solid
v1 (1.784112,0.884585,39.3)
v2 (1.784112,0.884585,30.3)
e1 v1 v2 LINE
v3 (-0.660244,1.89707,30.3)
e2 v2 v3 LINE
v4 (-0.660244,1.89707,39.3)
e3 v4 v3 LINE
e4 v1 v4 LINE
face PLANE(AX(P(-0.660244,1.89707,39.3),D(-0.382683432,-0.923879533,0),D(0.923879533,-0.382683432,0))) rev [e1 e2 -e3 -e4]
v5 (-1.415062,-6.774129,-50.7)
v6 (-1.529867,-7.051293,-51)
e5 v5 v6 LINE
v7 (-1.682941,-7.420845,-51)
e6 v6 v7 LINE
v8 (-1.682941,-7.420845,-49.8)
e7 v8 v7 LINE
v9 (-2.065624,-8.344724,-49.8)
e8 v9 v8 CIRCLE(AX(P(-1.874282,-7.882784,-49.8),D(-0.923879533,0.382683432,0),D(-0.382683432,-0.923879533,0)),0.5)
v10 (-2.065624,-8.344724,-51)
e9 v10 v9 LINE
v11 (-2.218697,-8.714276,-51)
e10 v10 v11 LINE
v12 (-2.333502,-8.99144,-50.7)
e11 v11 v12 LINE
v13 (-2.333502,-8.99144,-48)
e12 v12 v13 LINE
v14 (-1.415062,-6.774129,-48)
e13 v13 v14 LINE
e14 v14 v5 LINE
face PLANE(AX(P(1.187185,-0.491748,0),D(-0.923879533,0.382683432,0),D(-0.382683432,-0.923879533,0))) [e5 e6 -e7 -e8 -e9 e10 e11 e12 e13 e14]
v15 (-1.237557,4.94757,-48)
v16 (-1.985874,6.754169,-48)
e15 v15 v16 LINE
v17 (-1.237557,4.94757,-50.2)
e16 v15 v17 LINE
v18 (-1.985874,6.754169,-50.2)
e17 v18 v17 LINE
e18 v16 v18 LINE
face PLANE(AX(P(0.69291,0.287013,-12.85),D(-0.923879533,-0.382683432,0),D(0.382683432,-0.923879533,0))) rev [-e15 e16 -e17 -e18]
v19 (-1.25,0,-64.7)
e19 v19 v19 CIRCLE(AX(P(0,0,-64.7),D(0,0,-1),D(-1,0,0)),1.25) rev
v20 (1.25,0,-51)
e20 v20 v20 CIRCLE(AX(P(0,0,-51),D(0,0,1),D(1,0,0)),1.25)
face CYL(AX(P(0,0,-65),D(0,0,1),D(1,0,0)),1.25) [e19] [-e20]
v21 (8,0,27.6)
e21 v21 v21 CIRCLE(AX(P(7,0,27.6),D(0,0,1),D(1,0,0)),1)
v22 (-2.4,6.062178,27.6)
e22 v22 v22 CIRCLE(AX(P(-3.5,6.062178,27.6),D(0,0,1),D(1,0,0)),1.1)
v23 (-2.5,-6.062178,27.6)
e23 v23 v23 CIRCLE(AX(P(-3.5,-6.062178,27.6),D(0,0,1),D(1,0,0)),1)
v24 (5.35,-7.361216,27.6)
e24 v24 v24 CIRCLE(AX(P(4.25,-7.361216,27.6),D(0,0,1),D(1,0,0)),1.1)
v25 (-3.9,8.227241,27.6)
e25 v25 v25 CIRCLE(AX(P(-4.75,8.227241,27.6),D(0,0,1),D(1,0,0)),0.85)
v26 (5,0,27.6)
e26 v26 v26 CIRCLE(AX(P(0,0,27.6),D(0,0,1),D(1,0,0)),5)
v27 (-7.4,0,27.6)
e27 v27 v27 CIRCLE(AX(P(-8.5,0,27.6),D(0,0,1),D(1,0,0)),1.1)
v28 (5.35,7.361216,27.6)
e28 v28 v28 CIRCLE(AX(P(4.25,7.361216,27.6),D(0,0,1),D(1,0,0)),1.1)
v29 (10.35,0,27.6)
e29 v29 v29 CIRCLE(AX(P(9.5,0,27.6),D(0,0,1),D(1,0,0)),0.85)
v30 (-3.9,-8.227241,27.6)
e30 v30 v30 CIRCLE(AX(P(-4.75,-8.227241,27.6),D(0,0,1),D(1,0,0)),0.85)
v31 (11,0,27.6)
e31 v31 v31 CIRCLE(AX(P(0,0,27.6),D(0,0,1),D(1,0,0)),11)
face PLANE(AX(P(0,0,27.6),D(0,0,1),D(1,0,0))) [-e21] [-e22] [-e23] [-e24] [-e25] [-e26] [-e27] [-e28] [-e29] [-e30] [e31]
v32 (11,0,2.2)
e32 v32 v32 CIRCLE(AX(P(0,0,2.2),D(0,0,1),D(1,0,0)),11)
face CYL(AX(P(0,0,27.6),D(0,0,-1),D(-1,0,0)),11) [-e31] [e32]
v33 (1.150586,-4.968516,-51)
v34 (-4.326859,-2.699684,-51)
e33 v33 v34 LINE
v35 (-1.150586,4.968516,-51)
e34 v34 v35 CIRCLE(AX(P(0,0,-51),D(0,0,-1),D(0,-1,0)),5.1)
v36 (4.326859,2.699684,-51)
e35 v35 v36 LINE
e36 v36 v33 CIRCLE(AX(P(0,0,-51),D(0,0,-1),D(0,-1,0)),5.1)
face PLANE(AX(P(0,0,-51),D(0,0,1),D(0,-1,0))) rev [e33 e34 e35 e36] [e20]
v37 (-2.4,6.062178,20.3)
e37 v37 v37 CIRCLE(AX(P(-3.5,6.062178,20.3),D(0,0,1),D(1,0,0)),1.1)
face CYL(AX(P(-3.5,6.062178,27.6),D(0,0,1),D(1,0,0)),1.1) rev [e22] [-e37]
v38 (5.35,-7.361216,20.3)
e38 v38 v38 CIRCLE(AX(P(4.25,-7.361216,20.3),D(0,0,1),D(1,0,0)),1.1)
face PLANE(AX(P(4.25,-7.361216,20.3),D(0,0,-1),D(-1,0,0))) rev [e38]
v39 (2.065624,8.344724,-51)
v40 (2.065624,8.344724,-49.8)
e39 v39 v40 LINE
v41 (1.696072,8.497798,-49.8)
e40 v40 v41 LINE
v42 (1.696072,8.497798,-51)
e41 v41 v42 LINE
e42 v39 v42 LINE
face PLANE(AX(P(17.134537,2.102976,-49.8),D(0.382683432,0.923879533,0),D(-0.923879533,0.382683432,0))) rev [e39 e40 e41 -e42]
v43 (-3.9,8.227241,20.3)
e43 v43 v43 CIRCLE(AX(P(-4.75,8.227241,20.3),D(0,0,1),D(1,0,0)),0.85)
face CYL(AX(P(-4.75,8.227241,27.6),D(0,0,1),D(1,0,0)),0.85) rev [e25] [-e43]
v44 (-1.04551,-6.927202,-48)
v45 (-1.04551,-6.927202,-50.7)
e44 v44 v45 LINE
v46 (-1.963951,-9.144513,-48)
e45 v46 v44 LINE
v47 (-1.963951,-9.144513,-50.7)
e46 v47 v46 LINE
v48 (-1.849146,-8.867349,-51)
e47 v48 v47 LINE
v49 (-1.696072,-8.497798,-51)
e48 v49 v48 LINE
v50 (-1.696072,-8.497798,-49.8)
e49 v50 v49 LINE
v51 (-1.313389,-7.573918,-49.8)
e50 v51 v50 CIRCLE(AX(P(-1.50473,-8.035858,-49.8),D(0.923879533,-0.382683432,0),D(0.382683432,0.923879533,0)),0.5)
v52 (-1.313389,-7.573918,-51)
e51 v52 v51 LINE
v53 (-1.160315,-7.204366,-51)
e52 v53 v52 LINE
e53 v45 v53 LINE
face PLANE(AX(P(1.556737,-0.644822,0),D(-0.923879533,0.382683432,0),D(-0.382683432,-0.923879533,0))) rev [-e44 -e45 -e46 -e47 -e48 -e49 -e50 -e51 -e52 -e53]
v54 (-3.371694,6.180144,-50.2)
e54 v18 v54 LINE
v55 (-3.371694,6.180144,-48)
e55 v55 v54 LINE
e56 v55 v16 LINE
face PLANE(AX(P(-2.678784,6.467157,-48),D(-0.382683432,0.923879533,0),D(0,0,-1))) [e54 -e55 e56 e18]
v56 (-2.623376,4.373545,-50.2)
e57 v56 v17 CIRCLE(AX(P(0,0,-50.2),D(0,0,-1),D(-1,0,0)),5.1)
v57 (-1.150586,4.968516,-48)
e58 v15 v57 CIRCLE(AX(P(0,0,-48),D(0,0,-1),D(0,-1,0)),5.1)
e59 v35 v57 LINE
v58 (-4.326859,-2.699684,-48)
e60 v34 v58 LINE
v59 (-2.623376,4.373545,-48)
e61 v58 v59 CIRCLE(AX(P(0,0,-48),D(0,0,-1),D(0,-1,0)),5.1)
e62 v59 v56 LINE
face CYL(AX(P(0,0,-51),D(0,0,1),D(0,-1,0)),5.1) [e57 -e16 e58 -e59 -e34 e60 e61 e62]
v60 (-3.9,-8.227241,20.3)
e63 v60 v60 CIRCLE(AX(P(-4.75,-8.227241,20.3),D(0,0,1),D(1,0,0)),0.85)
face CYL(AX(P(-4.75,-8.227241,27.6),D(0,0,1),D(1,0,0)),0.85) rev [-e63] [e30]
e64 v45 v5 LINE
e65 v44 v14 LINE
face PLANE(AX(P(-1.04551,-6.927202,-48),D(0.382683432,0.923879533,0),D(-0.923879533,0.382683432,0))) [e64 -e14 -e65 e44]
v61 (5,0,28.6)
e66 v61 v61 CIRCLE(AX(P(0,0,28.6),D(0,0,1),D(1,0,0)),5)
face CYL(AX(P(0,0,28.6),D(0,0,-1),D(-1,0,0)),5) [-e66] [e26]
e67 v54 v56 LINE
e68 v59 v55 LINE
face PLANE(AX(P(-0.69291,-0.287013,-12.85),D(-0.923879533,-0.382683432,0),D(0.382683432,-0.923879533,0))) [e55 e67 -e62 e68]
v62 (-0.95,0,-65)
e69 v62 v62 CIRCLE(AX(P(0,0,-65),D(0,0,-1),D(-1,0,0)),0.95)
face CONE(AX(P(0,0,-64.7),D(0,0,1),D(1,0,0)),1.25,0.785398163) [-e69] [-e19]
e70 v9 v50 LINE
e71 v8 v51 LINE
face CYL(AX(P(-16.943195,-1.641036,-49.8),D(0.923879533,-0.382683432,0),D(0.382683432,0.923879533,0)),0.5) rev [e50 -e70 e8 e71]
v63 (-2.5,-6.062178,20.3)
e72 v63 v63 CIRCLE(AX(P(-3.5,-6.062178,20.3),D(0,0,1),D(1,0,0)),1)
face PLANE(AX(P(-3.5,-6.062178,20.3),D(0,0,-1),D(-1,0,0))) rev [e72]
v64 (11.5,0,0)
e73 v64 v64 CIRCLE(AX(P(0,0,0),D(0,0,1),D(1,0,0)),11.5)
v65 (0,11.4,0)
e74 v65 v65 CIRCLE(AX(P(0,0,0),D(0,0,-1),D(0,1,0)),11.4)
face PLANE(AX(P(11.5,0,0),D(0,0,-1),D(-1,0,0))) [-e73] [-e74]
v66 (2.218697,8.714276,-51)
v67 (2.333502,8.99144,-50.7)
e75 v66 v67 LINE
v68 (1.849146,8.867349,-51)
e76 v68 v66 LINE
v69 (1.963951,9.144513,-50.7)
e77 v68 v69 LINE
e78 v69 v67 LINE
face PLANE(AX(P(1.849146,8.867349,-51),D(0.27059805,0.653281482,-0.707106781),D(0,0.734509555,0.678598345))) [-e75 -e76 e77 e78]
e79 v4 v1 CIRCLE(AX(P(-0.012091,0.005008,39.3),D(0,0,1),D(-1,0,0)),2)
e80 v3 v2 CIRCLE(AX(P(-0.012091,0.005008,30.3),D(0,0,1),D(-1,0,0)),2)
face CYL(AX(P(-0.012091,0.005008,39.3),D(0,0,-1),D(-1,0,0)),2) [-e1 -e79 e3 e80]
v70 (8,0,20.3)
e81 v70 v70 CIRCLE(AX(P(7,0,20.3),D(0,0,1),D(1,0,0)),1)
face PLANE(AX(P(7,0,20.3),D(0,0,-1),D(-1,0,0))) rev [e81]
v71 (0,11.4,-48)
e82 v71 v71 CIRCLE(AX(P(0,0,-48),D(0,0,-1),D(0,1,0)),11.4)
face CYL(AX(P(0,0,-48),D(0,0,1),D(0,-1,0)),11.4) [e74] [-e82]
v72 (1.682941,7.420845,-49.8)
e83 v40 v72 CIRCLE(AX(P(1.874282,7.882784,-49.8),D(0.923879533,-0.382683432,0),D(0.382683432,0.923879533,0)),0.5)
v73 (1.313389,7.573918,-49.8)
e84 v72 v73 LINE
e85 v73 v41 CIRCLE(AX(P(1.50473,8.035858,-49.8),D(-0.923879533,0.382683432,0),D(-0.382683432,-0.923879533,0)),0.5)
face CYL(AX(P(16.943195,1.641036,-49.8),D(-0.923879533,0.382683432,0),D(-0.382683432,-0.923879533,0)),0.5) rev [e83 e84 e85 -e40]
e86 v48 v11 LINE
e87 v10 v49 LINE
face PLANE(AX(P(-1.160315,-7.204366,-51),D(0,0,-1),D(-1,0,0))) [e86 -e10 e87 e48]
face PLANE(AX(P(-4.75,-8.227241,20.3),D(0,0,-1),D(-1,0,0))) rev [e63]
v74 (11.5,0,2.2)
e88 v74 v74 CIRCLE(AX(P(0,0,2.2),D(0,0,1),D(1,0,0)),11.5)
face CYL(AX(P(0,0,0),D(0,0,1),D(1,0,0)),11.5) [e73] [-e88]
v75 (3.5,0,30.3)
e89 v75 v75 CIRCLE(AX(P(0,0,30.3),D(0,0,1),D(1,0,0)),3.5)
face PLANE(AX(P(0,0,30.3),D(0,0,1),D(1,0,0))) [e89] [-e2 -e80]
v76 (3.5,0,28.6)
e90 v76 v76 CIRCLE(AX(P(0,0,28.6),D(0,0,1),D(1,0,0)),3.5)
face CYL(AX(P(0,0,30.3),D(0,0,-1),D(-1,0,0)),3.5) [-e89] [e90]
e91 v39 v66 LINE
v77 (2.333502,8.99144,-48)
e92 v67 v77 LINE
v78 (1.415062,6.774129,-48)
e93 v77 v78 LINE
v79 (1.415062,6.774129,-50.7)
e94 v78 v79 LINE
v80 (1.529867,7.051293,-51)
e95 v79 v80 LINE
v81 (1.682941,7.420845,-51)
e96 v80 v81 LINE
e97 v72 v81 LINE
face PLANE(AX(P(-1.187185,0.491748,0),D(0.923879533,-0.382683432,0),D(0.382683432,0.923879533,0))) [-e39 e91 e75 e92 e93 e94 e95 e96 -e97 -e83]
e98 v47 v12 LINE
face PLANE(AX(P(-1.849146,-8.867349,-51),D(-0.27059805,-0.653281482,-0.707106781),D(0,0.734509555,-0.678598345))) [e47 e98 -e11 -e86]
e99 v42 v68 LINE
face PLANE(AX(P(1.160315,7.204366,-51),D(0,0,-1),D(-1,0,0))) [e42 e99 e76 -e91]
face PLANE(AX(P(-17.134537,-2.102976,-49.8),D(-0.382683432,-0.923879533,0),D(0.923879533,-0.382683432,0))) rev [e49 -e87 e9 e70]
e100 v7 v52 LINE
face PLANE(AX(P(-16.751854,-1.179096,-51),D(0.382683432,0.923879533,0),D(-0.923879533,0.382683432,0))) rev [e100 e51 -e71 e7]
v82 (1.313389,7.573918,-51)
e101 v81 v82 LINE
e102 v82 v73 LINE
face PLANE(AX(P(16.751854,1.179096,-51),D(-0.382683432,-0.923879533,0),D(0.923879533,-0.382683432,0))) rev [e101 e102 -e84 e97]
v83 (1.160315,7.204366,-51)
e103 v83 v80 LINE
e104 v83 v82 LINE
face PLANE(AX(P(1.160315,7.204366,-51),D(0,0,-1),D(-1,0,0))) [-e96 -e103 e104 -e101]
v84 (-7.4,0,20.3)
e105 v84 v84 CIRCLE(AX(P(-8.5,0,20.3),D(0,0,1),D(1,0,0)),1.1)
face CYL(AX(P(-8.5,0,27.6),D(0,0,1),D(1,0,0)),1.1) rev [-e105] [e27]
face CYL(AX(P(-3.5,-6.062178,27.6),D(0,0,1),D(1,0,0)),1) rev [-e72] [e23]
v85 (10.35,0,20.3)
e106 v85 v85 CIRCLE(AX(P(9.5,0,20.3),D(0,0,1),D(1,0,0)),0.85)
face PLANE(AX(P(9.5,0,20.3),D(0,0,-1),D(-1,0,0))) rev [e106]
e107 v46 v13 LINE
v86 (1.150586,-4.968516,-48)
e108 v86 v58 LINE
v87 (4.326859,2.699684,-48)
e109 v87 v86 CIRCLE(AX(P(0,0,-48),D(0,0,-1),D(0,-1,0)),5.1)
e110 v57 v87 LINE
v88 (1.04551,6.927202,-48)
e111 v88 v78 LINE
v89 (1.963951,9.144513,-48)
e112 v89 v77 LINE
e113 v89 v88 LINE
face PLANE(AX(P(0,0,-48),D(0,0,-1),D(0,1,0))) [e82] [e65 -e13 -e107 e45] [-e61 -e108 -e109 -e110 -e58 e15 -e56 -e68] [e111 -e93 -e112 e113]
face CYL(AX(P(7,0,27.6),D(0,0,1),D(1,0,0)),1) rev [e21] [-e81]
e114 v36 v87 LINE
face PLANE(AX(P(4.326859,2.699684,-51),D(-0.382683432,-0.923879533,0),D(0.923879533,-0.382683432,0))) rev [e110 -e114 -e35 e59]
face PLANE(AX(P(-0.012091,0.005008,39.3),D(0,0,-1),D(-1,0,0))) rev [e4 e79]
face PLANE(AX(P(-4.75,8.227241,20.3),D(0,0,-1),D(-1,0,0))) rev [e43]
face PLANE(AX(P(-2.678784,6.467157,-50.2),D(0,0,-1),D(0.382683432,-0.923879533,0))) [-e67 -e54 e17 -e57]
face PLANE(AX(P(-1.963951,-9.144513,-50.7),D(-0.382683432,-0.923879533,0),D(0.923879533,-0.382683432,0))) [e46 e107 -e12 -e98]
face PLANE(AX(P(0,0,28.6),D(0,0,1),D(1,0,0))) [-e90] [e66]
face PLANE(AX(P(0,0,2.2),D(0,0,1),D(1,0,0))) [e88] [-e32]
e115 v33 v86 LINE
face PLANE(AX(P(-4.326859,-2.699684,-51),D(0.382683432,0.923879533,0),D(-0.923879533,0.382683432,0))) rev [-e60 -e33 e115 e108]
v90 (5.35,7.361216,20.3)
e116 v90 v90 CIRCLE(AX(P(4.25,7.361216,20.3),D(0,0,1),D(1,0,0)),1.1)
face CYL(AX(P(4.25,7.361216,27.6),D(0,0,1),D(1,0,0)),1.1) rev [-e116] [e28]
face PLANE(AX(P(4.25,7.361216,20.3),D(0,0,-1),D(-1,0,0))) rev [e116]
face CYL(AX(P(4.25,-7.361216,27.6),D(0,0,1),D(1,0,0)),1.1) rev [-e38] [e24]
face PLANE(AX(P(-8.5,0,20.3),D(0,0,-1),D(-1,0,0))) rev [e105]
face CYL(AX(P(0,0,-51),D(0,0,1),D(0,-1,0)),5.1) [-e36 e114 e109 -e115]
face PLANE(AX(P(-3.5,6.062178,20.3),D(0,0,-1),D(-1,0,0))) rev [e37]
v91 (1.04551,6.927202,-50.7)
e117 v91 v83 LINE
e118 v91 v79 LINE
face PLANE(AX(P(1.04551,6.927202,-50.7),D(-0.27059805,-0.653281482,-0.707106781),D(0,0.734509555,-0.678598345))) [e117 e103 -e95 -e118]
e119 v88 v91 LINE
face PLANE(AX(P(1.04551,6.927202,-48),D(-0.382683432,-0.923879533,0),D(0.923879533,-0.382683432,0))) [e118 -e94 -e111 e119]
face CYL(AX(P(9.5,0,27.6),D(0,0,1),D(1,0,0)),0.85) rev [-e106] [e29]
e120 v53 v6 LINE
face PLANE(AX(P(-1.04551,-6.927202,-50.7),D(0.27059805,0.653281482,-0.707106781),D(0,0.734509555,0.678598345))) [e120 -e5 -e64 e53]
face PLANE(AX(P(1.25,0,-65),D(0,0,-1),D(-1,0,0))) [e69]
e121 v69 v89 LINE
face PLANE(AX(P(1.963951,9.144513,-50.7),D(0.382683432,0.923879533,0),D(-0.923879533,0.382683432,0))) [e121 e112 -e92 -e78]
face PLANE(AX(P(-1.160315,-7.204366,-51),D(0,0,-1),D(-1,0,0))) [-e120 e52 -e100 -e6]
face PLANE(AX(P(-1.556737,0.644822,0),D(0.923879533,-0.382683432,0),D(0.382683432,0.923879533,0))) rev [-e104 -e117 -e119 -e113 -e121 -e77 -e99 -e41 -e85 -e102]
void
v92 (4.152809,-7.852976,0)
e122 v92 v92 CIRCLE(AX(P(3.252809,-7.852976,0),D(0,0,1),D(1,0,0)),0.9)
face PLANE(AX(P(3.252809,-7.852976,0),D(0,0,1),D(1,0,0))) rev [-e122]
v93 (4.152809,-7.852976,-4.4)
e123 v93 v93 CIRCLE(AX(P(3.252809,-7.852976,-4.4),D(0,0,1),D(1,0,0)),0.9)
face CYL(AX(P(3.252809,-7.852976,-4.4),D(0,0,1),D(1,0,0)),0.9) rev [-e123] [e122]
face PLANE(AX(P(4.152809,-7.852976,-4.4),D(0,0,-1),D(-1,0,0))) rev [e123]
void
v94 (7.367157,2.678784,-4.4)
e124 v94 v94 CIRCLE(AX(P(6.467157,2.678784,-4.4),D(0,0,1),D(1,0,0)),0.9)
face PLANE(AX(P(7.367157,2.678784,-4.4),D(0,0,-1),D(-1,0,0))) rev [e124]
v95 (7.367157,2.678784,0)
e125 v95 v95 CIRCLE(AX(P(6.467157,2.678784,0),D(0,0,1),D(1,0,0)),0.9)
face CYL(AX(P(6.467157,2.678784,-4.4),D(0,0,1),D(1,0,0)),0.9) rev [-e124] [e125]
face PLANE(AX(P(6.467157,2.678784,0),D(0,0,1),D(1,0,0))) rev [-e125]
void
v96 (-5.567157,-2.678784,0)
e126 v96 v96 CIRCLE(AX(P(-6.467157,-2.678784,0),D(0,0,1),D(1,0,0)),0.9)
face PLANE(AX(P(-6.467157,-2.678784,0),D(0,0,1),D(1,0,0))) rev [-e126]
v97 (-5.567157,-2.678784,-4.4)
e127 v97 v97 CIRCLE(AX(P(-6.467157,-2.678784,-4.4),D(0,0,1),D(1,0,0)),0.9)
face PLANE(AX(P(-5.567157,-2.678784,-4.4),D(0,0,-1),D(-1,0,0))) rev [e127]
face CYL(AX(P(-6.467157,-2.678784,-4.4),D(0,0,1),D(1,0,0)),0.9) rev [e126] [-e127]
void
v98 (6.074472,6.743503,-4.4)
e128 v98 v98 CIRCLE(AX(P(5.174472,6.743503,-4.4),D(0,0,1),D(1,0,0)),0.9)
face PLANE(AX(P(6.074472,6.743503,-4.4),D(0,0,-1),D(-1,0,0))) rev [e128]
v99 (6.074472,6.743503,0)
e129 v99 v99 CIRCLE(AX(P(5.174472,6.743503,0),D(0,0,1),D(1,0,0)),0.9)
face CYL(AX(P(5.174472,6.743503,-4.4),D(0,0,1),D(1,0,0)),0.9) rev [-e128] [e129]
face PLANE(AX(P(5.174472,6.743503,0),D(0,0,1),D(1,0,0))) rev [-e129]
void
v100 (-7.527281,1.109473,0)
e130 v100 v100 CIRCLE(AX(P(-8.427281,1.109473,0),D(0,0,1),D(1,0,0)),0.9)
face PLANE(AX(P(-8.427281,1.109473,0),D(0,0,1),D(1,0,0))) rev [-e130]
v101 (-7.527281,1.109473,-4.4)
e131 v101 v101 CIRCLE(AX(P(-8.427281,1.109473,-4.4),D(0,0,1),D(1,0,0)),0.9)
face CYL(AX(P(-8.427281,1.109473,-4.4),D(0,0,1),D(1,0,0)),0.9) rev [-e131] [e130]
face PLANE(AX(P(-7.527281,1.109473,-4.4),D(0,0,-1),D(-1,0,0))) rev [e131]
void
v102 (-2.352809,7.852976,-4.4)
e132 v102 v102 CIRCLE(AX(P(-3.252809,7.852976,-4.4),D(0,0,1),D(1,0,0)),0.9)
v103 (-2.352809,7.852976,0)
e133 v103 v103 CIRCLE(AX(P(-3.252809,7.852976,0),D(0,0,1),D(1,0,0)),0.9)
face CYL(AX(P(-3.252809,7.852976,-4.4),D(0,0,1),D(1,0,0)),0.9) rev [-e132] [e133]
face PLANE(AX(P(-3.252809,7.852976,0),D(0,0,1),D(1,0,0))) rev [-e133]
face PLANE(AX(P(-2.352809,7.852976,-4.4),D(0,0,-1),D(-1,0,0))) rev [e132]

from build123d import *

# Parameters (mm, degrees)
CROQUIS1_W                          = 11.5
CROQUIS1_H                          = 2.2
CROQUIS2_R                          = 11.4
SALIENTE_EXTRUIR1_DEPTH             = 48
SALIENTE_EXTRUIR2_DEPTH             = 0.4
CORTAR_EXTRUIR1_DEPTH               = 55.027539947
SALIENTE_EXTRUIR3_DEPTH             = 0.4
CORTAR_EXTRUIR2_DEPTH               = 55.027539947
SALIENTE_EXTRUIR4_DEPTH             = 3
CROQUIS8_R                          = 11
SALIENTE_EXTRUIR5_DEPTH             = 25.4
CROQUIS9_R                          = 5
SALIENTE_EXTRUIR6_DEPTH             = 1
CROQUIS10_R                         = 3.5
SALIENTE_EXTRUIR7_DEPTH             = 1.7
SALIENTE_EXTRUIR8_DEPTH             = 9
CROQUIS12_W                         = 1.25
CROQUIS12_H                         = 14
CROQUIS13_W                         = 0.9
CROQUIS13_H                         = 4.4
CROQUIS14_W                         = 0.9
CROQUIS14_H                         = 4.4
CROQUIS15_W                         = 0.9
CROQUIS15_H                         = 4.4
CROQUIS16_W                         = 0.9
CROQUIS16_H                         = 4.4
CROQUIS17_W                         = 0.9
CROQUIS17_H                         = 4.4
CROQUIS18_W                         = 0.9
CROQUIS18_H                         = 4.4
DI_METRO_DE_TALADRO_2_0_2_1_D       = 2
DI_METRO_DE_TALADRO_2_0_2_1_DEPTH   = 7.3
DI_METRO_DE_TALADRO_1_7_1_7_1_D     = 1.7
DI_METRO_DE_TALADRO_1_7_1_7_1_DEPTH = 7.3
DI_METRO_DE_TALADRO_2_2_2_2_1_D     = 2.2
DI_METRO_DE_TALADRO_2_2_2_2_1_DEPTH = 7.3
NERVIO1_START                       = -0.75
NERVIO1_OUTLINE_W                   = 3
NERVIO1_OUTLINE_H                   = 3.2
NERVIO1_DEPTH                       = 1.5
CHAFL_N1_SIZE                       = 0.3


# Read off the part's stored shape, not the designer's step: Nervio1
with BuildPart() as part:
    # Croquis1 → Revolución1 (revolve)
    with BuildSketch(Plane(origin=(0, 0, 0), x_dir=(1, 0, 0), z_dir=(0, 1, 0))):
        with Locations((5.75, -1.1)):
            Rectangle(CROQUIS1_W, CROQUIS1_H)
    revolve(axis=Axis((0, 0, 0), (0, 0, 1)))

    # Croquis2 → Saliente-Extruir1 (add)
    with BuildSketch(Plane(origin=(0, 0, 0), x_dir=(-1, 0, 0), z_dir=(0, 0, -1))):
        with Locations(Location((0, 0, 0), (0, 0, 90))):
            Circle(CROQUIS2_R)
    extrude(amount=SALIENTE_EXTRUIR1_DEPTH)

    # Croquis3 → Saliente-Extruir2 (add)
    with BuildSketch(Plane(origin=(-1.187185199, 0.491748211, 0), x_dir=(0.38268343236508984, 0.9238795325112867, 0), z_dir=(0.9238795325112867, -0.38268343236508984, 0))):
        Polygon((7.1, -51), (8.9, -51), (9.2, -50.7), (9.2, -48), (6.8, -48), (6.8, -50.7), align=None)
    extrude(amount=-SALIENTE_EXTRUIR2_DEPTH)

    # Croquis4 → Cortar-Extruir1 (cut, through all)
    with BuildSketch(Plane(origin=(-1.556737012, 0.644821584, 0), x_dir=(0, 0, 1), z_dir=(-0.9238795325112865, 0.3826834323650905, 0))):
        with BuildLine():
            Line((-51, 8.5), (-51, 7.5))
            Line((-51, 7.5), (-49.8, 7.5))
            ThreePointArc((-49.8, 7.5), (-49.3, 8), (-49.8, 8.5))
            Line((-49.8, 8.5), (-51, 8.5))
        make_face()
    extrude(amount=-CORTAR_EXTRUIR1_DEPTH, mode=Mode.SUBTRACT)

    # Croquis5 → Saliente-Extruir3 (add)
    with BuildSketch(Plane(origin=(1.187185199, -0.491748211, 0), x_dir=(-0.3826834323650898, -0.9238795325112867, 0), z_dir=(-0.9238795325112867, 0.3826834323650898, 0))):
        Polygon((7.1, -51), (8.9, -51), (9.2, -50.7), (9.2, -48), (6.8, -48), (6.8, -50.7), align=None)
    extrude(amount=-SALIENTE_EXTRUIR3_DEPTH)

    # Croquis6 → Cortar-Extruir2 (cut, through all)
    with BuildSketch(Plane(origin=(1.556737012, -0.644821584, 0), x_dir=(0, 0, -1), z_dir=(0.9238795325112837, -0.38268343236509744, -9.353628982466952e-15))):
        with BuildLine():
            Line((51, -7.5), (49.8, -7.5))
            ThreePointArc((49.8, -7.5), (49.3, -8), (49.8, -8.5))
            Line((49.8, -8.5), (51, -8.5))
            Line((51, -8.5), (51, -7.5))
        make_face()
    extrude(amount=-CORTAR_EXTRUIR2_DEPTH, mode=Mode.SUBTRACT)

    # Croquis7 → Saliente-Extruir4 (add)
    with BuildSketch(Plane(origin=(0, 0, -48), x_dir=(-1, 0, 0), z_dir=(0, 0, -1))):
        with BuildLine():
            Line((-4.326858651, 2.699684096), (1.150586162, 4.968516024))
            ThreePointArc((1.150586162, 4.968516024), (4.711785616, 1.951685505), (4.326858651, -2.699684096))
            Line((4.326858651, -2.699684096), (-1.150586162, -4.968516024))
            ThreePointArc((-1.150586162, -4.968516024), (-4.711785616, -1.951685505), (-4.326858651, 2.699684096))
        make_face()
    extrude(amount=SALIENTE_EXTRUIR4_DEPTH)

    # Croquis8 → Saliente-Extruir5 (add)
    with BuildSketch(Plane.XY.offset(2.2)):
        Circle(CROQUIS8_R)
    extrude(amount=SALIENTE_EXTRUIR5_DEPTH)

    # Croquis9 → Saliente-Extruir6 (add)
    with BuildSketch(Plane.XY.offset(27.6)):
        Circle(CROQUIS9_R)
    extrude(amount=SALIENTE_EXTRUIR6_DEPTH)

    # Croquis10 → Saliente-Extruir7 (add)
    with BuildSketch(Plane.XY.offset(28.6)):
        Circle(CROQUIS10_R)
    extrude(amount=SALIENTE_EXTRUIR7_DEPTH)

    # Croquis11 → Saliente-Extruir8 (add)
    with BuildSketch(Plane.XY.offset(30.3)):
        with BuildLine():
            Line((-0.660243548, 1.897070133), (1.784111936, 0.88458494))
            ThreePointArc((1.784111936, 0.88458494), (-0.777457819, -1.842750828), (-0.660243548, 1.897070133))
        make_face()
    extrude(amount=SALIENTE_EXTRUIR8_DEPTH)

    # Croquis12 → Revolución2 (revolve)
    with BuildSketch(Plane(origin=(0, 0, 0), x_dir=(1, 0, 0), z_dir=(0, 1, 0))):
        with Locations((0.625, 58)):
            Rectangle(CROQUIS12_W, CROQUIS12_H)
    revolve(axis=Axis((0, 0, -65), (0, 0, 1)))

    # Croquis13 → Cortar-Revolución1 (revolve, cut)
    with BuildSketch(Plane(origin=(0, -7.852976026, 0), x_dir=(1, 0, 0), z_dir=(0, 1, 0))):
        with Locations((3.702809175, 2.2)):
            Rectangle(CROQUIS13_W, CROQUIS13_H)
    revolve(axis=Axis((3.252809175, -7.852976026, -4.4), (0, 0, 1)), mode=Mode.SUBTRACT)

    # Croquis14 → Cortar-Revolución2 (revolve, cut)
    with BuildSketch(Plane(origin=(0, 2.678784027, 0), x_dir=(1, 0, 0), z_dir=(0, 1, 0))):
        with Locations((6.917156728, 2.2)):
            Rectangle(CROQUIS14_W, CROQUIS14_H)
    revolve(axis=Axis((6.467156728, 2.678784027, -4.4), (0, 0, 1)), mode=Mode.SUBTRACT)

    # Croquis15 → Cortar-Revolución3 (revolve, cut)
    with BuildSketch(Plane(origin=(0, -2.678784027, 0), x_dir=(1, 0, 0), z_dir=(0, 1, 0))):
        with Locations((-6.017156728, 2.2)):
            Rectangle(CROQUIS15_W, CROQUIS15_H)
    revolve(axis=Axis((-6.467156728, -2.678784027, -4.4), (0, 0, 1)), mode=Mode.SUBTRACT)

    # Croquis16 → Cortar-Revolución4 (revolve, cut)
    with BuildSketch(Plane(origin=(0, 6.743503392, 0), x_dir=(1, 0, 0), z_dir=(0, 1, 0))):
        with Locations((5.624472147, 2.2)):
            Rectangle(CROQUIS16_W, CROQUIS16_H)
    revolve(axis=Axis((5.174472147, 6.743503392, -4.4), (0, 0, 1)), mode=Mode.SUBTRACT)

    # Croquis17 → Cortar-Revolución5 (revolve, cut)
    with BuildSketch(Plane(origin=(0, 1.109472634, 0), x_dir=(1, 0, 0), z_dir=(0, 1, 0))):
        with Locations((-7.977281322, 2.2)):
            Rectangle(CROQUIS17_W, CROQUIS17_H)
    revolve(axis=Axis((-8.427281322, 1.109472634, -4.4), (0, 0, 1)), mode=Mode.SUBTRACT)

    # Croquis18 → Cortar-Revolución6 (revolve, cut)
    with BuildSketch(Plane(origin=(0, 7.852976026, 0), x_dir=(1, 0, 0), z_dir=(0, 1, 0))):
        with Locations((-2.802809175, 2.2)):
            Rectangle(CROQUIS18_W, CROQUIS18_H)
    revolve(axis=Axis((-3.252809175, 7.852976026, -4.4), (0, 0, 1)), mode=Mode.SUBTRACT)

    # Diámetro de taladro Ø2.0 (2)1
    with Locations(Plane.XY.offset(27.6)):
        with Locations((-3.5, -6.062177826), (7, 0)):
            Hole(DI_METRO_DE_TALADRO_2_0_2_1_D / 2, depth=DI_METRO_DE_TALADRO_2_0_2_1_DEPTH)

    # Diámetro de taladro Ø1.7 (1.7)1
    with Locations(Plane.XY.offset(27.6)):
        with Locations((9.5, 0), (-4.75, 8.227241336), (-4.75, -8.227241336)):
            Hole(DI_METRO_DE_TALADRO_1_7_1_7_1_D / 2, depth=DI_METRO_DE_TALADRO_1_7_1_7_1_DEPTH)

    # Diámetro de taladro Ø2.2 (2.2)1
    with Locations(Plane.XY.offset(27.6)):
        with Locations((4.25, 7.361215932), (-8.5, 0), (-3.5, 6.062177826), (4.25, -7.361215932)):
            Hole(DI_METRO_DE_TALADRO_2_2_2_2_1_D / 2, depth=DI_METRO_DE_TALADRO_2_2_2_2_1_DEPTH)

    # Nervio1 outline → Nervio1 (add)
    with BuildSketch(Plane(origin=(0, 0, 0), x_dir=(0.38268343236508995, -0.9238795325112867, 0), z_dir=(-0.9238795325112867, -0.38268343236508995, 0)).offset(NERVIO1_START)):
        with Locations((-5.5, -48.6)):
            Rectangle(NERVIO1_OUTLINE_W, NERVIO1_OUTLINE_H)
    extrude(amount=NERVIO1_DEPTH)

    # Chaflán1
    chafl_n1_edges = [part.edges().sort_by_distance(p)[0] for p in [
        (-1.25, 0, -65),
    ]]
    chamfer(chafl_n1_edges, length=CHAFL_N1_SIZE)


solid = part.part
